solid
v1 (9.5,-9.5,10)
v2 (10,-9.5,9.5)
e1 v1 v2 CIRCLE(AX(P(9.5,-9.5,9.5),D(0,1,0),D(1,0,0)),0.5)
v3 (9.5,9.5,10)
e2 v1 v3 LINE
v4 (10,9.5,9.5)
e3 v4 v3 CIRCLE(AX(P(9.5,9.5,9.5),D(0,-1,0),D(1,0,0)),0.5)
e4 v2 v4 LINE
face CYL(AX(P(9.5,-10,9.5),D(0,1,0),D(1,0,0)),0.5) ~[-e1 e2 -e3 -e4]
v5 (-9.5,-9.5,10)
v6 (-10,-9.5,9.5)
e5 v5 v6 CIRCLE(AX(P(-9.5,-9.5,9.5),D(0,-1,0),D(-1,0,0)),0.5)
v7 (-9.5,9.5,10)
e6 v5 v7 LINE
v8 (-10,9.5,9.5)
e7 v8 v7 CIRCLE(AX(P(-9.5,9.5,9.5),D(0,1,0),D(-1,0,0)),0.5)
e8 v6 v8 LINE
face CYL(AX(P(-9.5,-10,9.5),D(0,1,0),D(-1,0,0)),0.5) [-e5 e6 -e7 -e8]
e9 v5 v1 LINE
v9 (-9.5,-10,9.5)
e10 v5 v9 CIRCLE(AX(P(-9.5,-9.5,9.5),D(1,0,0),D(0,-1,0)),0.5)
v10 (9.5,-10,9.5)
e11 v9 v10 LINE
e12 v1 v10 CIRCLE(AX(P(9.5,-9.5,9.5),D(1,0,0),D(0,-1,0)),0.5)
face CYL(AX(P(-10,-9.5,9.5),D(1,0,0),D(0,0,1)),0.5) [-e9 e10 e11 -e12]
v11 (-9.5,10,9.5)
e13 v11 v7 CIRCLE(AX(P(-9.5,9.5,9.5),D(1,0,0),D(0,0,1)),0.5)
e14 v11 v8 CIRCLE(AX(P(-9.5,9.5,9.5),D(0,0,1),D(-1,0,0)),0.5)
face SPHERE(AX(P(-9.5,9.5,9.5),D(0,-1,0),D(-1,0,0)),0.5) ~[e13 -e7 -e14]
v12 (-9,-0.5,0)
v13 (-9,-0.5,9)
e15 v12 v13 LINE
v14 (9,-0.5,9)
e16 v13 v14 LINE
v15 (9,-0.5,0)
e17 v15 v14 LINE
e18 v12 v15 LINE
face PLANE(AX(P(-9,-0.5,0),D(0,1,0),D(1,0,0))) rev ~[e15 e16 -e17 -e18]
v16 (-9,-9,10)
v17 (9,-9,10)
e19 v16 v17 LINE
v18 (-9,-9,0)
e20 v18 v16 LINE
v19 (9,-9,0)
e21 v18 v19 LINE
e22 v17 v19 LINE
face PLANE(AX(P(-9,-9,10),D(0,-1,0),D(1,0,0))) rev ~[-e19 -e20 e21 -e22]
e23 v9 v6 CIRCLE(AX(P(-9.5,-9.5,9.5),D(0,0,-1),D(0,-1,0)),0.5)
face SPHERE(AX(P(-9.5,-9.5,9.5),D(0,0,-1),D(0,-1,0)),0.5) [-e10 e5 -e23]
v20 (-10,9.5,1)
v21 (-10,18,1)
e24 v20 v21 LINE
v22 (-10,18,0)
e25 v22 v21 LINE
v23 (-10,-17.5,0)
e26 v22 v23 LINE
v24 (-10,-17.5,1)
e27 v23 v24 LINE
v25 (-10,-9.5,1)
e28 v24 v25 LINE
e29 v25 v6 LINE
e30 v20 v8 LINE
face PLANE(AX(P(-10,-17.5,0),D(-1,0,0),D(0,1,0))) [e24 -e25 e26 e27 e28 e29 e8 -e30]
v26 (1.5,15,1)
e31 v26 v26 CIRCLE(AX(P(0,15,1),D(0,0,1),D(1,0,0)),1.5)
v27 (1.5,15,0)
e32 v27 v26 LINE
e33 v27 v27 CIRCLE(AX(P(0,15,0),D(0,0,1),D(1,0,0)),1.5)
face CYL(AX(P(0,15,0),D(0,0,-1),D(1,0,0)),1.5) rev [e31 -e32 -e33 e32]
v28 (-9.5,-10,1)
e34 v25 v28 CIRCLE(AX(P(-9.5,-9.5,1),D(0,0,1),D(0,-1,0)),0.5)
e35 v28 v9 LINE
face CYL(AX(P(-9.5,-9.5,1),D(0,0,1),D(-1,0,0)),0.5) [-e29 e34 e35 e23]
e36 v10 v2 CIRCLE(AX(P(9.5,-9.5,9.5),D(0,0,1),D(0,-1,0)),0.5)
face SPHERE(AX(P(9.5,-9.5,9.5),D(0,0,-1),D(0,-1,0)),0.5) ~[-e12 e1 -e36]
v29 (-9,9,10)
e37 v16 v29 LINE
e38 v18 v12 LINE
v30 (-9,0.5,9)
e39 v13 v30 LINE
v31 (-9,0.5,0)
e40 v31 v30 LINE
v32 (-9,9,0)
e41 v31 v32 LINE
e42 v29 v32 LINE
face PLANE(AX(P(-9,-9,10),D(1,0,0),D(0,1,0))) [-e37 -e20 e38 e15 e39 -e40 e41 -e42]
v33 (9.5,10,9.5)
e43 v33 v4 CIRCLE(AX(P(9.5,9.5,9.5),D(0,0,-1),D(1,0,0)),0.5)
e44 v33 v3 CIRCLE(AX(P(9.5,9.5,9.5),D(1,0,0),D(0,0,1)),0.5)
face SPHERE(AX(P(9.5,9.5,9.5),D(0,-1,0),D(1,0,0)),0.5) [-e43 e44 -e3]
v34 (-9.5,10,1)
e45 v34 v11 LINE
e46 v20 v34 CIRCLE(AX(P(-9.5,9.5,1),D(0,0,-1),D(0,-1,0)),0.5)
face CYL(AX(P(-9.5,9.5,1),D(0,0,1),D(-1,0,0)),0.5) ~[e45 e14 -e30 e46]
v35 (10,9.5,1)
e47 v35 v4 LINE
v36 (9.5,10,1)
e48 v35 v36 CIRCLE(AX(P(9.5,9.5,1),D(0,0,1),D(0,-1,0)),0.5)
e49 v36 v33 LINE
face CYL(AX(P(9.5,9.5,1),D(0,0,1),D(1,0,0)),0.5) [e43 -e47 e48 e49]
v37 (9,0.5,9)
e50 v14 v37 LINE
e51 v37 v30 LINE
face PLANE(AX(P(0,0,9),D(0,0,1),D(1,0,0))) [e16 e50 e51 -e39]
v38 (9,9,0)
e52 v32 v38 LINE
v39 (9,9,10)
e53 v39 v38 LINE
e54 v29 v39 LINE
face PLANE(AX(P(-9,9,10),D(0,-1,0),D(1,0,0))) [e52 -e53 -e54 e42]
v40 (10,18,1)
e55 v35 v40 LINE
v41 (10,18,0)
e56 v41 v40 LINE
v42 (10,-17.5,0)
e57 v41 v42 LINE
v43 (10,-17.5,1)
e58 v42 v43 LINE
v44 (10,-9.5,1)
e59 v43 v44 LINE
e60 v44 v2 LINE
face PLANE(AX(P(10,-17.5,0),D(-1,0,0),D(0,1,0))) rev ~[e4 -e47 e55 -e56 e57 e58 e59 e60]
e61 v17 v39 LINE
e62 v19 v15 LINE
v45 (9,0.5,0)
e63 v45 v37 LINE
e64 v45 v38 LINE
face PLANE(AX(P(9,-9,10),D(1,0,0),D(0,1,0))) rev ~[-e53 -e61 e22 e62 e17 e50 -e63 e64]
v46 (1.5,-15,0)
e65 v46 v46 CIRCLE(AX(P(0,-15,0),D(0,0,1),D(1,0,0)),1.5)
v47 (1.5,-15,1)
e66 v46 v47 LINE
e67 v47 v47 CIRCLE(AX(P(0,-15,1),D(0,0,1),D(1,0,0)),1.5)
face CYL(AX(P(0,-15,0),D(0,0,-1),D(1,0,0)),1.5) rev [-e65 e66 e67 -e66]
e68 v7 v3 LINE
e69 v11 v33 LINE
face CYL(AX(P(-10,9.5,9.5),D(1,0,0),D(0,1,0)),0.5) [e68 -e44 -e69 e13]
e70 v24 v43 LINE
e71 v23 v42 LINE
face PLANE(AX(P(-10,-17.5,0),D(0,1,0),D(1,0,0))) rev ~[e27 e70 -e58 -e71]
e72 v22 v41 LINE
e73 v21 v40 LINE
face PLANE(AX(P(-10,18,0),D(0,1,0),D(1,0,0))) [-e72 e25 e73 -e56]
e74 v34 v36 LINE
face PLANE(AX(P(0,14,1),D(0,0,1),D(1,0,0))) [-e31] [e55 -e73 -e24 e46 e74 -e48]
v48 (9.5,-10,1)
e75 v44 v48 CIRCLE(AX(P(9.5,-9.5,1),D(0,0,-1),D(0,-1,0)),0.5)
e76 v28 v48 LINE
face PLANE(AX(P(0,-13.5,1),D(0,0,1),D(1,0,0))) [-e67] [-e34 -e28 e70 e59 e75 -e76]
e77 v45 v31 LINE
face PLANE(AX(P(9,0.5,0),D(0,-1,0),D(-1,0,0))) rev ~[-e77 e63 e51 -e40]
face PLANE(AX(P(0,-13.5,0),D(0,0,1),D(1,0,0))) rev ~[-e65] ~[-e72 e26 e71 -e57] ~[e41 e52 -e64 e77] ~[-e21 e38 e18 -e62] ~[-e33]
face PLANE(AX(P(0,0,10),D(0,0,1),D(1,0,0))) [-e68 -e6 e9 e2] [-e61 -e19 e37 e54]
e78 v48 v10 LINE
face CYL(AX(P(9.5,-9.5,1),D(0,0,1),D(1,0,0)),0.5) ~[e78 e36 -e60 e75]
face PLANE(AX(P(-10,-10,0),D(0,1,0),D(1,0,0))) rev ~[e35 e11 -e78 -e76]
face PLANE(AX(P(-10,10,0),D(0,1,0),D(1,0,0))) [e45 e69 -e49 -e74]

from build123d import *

# Parameters (mm, degrees)
F0_W     = 20
F0_H     = 20
F1_DEPTH = 10
F2_T     = -1
F4_DEPTH = 9
F5_W     = 20
F5_H     = 8
F5_R     = 1.5
F6_DEPTH = 1
F7_W     = 18
F7_H     = 18
F8_DEPTH = 1
F9_R     = 0.5


with BuildPart() as f1:
    # F0 (on Top) → F1 (new body)
    with BuildSketch(Plane.XY):
        Rectangle(F0_W, F0_H)
    extrude(amount=F1_DEPTH)

    # F2
    f2_openings = [f1.faces().sort_by_distance(p)[0] for p in [
        (0, 0, 0),
    ]]
    offset(amount=F2_T, openings=f2_openings)

    # F3 (on Top) → F4 (join)
    with BuildSketch(Plane.XY):
        Polygon((9, -0.5), (9, 0.5), (0.5, 0.5), (-0.5, 0.5), (-9, 0.5), (-9, -0.5), (-0.5, -0.5), (0.5, -0.5), align=None)
    extrude(amount=F4_DEPTH)

    # F5 (on Top) → F6 (join)
    with BuildSketch(Plane.XY):
        with Locations((0, -13.5)):
            Rectangle(F5_W, F5_H)
        with Locations((0, -15)):
            Circle(F5_R, mode=Mode.SUBTRACT)
        with Locations((0, 14)):
            Rectangle(F5_W, F5_H)
        with Locations((0, 15)):
            Circle(F5_R, mode=Mode.SUBTRACT)
    extrude(amount=F6_DEPTH)

    # F7 (on face) → F8 (cut)
    with BuildSketch(Plane.XY.offset(10)):
        Rectangle(F7_W, F7_H)
    extrude(amount=-F8_DEPTH, mode=Mode.SUBTRACT)

    # F9
    f9_edges = [f1.edges().sort_by_distance(p)[0] for p in [
        (-10, -10, 5.5),
        (10, -10, 5.5),
        (0, -10, 10),
        (10, 0, 10),
        (-10, 0, 10),
        (10, 10, 5.5),
        (-10, 10, 5.5),
        (0, 10, 10),
    ]]
    fillet(f9_edges, radius=F9_R)


solid = f1.part
